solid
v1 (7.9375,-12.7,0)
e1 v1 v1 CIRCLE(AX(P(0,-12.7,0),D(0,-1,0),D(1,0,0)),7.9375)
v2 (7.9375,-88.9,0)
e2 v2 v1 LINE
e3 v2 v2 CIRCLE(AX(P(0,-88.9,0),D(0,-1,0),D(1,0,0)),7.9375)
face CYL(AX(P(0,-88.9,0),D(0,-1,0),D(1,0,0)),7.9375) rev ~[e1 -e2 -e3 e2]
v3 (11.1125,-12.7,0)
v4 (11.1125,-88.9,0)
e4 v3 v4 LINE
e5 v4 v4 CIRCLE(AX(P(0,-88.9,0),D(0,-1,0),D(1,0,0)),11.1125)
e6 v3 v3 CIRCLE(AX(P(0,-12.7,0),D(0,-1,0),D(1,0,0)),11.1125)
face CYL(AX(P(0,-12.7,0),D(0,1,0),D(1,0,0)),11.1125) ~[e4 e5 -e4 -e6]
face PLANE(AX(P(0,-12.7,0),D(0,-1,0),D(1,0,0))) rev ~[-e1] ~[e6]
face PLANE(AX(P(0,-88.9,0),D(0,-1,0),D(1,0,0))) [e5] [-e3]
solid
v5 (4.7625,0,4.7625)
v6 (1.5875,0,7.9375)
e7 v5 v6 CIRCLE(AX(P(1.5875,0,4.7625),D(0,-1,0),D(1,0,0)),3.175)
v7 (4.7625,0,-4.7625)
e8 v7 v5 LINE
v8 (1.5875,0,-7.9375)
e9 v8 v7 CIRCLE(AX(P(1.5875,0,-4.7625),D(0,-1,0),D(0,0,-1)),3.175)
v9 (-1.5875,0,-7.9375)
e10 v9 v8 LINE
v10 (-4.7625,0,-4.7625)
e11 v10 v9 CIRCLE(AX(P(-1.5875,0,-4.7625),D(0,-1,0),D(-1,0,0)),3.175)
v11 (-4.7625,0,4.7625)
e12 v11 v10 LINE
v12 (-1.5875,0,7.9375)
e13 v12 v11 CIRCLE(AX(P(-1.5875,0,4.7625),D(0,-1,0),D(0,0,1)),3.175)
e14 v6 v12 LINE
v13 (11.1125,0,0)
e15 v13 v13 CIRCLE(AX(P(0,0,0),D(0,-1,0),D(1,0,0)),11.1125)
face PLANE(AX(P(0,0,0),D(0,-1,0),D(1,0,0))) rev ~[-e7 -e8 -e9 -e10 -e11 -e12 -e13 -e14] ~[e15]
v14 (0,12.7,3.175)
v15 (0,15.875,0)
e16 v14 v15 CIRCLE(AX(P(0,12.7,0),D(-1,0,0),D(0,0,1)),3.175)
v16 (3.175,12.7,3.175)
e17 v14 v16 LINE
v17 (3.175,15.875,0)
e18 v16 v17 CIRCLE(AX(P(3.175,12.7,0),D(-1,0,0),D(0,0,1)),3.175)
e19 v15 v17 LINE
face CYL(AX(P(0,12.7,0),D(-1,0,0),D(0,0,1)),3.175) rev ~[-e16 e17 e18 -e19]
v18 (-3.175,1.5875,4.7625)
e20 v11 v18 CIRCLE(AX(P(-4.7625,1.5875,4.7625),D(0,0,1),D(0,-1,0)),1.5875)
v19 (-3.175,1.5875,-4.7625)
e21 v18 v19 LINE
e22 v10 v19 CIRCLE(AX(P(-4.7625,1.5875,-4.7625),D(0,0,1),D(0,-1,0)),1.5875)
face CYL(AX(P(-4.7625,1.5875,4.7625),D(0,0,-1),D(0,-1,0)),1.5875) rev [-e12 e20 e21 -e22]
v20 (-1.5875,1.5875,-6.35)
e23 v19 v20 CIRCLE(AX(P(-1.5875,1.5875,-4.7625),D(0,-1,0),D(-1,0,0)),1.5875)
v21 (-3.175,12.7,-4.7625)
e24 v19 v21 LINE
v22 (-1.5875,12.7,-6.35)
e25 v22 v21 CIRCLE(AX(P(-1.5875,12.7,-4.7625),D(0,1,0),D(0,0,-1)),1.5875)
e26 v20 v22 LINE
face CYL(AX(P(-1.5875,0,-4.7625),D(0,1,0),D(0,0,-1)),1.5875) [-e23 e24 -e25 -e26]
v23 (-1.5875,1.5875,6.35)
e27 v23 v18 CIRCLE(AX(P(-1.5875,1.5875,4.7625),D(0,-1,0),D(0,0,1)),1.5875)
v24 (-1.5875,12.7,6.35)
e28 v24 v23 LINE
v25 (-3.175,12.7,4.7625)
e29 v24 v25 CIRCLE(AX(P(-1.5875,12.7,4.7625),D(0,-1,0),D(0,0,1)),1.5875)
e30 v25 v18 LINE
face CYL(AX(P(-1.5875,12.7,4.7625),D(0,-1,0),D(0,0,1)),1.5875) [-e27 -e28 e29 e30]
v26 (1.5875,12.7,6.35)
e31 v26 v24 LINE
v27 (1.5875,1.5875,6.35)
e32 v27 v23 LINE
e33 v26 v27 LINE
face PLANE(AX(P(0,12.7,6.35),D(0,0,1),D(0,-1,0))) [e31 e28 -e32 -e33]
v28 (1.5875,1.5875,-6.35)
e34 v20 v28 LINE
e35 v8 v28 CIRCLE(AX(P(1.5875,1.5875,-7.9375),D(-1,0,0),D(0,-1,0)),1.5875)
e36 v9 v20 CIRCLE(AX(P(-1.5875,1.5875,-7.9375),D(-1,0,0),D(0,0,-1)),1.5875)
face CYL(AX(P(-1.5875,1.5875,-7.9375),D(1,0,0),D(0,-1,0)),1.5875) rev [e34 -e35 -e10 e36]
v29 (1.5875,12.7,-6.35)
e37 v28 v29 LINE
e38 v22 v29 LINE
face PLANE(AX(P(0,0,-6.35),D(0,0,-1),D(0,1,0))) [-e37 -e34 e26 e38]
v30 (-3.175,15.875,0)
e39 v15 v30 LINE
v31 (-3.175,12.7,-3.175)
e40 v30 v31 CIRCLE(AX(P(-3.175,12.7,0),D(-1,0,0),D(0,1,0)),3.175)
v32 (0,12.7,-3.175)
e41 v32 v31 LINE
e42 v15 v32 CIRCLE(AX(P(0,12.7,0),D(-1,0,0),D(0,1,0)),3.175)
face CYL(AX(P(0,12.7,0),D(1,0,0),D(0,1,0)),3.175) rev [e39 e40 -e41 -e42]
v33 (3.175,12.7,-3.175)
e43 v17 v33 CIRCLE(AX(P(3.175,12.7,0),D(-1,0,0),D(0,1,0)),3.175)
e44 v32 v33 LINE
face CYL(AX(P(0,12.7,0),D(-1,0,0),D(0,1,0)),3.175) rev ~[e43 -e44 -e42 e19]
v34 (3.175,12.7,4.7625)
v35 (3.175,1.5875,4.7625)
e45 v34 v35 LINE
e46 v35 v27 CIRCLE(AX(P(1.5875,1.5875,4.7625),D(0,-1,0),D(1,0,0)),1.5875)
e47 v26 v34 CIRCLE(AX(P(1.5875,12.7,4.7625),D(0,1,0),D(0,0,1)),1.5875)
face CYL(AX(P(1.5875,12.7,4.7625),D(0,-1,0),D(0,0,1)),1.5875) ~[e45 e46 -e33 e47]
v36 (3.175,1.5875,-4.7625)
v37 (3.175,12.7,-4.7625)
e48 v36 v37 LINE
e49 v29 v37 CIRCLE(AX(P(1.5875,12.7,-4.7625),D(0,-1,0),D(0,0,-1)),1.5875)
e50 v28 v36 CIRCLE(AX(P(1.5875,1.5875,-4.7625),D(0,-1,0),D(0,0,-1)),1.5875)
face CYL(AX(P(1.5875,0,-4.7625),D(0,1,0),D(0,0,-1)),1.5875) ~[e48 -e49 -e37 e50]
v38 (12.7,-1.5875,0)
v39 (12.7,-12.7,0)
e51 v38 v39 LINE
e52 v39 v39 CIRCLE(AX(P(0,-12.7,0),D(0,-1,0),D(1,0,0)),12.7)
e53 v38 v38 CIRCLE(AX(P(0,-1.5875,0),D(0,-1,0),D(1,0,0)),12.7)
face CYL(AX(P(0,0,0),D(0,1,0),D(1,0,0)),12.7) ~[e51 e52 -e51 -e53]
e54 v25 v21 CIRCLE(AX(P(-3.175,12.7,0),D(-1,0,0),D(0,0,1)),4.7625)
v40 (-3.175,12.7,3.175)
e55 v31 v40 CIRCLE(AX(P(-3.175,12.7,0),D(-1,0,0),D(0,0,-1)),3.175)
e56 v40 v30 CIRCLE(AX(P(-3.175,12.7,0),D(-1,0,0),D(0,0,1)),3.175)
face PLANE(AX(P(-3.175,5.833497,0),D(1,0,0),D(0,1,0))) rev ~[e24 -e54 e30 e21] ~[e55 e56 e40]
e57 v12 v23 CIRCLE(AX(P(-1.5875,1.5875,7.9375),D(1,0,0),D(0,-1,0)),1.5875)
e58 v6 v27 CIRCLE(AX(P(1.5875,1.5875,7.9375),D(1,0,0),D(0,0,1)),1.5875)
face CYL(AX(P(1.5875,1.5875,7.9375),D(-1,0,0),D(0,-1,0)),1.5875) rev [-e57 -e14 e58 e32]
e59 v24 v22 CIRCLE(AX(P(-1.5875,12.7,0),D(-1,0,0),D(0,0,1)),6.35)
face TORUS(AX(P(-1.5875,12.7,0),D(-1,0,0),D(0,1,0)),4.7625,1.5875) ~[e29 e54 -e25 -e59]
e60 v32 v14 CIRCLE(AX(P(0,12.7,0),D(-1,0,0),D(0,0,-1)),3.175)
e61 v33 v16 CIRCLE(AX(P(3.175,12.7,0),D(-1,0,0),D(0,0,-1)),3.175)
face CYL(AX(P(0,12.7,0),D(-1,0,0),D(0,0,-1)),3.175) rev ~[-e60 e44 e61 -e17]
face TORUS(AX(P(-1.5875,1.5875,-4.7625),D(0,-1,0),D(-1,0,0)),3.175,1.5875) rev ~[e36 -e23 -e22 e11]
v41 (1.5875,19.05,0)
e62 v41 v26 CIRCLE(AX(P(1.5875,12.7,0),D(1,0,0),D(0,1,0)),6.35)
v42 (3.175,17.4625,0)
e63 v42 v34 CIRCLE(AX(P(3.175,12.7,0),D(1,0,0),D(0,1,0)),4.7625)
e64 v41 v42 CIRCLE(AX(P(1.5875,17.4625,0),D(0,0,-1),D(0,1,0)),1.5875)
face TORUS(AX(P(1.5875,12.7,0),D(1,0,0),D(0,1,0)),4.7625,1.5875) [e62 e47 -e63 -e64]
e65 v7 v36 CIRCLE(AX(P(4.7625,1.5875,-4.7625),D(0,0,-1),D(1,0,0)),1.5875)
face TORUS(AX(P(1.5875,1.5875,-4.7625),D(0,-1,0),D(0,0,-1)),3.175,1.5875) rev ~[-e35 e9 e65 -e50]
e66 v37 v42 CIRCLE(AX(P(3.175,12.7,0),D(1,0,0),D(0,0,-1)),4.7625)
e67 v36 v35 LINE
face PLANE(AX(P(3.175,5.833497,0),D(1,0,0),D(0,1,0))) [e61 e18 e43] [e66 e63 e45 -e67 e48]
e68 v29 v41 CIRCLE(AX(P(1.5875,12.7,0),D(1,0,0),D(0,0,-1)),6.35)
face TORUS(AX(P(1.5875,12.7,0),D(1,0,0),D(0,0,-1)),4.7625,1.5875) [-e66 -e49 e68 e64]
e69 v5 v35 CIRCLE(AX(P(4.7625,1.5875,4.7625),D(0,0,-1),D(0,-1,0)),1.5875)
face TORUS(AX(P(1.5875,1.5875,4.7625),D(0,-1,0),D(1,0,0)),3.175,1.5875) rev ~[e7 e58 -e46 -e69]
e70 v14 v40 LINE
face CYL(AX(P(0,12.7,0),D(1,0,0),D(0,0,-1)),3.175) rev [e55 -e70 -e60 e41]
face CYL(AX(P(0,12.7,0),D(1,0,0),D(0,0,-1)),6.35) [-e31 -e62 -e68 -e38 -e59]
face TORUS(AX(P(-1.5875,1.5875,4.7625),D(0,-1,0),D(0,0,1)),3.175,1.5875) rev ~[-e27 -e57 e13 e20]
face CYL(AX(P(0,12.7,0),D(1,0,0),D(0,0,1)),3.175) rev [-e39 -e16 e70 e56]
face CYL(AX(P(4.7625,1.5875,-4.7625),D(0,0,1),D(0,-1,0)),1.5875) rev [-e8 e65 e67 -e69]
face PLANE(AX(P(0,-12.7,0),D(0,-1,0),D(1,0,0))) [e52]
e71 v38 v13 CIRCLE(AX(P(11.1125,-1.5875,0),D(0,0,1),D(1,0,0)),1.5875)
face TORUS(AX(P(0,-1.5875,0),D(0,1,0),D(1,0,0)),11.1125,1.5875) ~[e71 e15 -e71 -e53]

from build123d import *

# Parameters (mm, degrees)
F0_R     = 12.7
F1_DEPTH = 12.7
F3_DEPTH = 3.175
F4_F1_R  = 1.5875
F4_F2_R  = 1.5875
F5_R     = 11.1125
F6_DEPTH = 76.2
F7_R     = 7.9375
F8_DEPTH = 76.2


with BuildPart() as f1:
    # F0 (on Front) → F1 (new body)
    with BuildSketch(Plane.XZ):
        Circle(F0_R)
    extrude(amount=F1_DEPTH)

    # F2 (on Right) → F3 (join, symmetric)
    with BuildSketch(Plane.YZ):
        with BuildLine():
            Line((0, 6.35), (0, -6.35))
            Line((0, -6.35), (12.7, -6.35))
            ThreePointArc((12.7, -6.35), (6.35, 0), (12.7, 6.35))
            Line((12.7, 6.35), (0, 6.35))
        make_face()
        with BuildLine():
            ThreePointArc((12.7, 6.35), (6.35, 0), (12.7, -6.35))
            Line((12.7, -6.35), (12.7, -3.175))
            ThreePointArc((12.7, -3.175), (9.525, 0), (12.7, 3.175))
            Line((12.7, 3.175), (12.7, 6.35))
        make_face()
        with BuildLine():
            Line((12.7, -3.175), (12.7, -6.35))
            ThreePointArc((12.7, -6.35), (17.1901280605, -4.4901280605), (19.05, 0))
            ThreePointArc((19.05, 0), (17.1901280605, 4.4901280605), (12.7, 6.35))
            Line((12.7, 6.35), (12.7, 3.175))
            ThreePointArc((12.7, 3.175), (14.9450640303, 2.2450640303), (15.875, 0))
            ThreePointArc((15.875, 0), (14.9450640303, -2.2450640303), (12.7, -3.175))
        make_face()
    extrude(amount=F3_DEPTH, both=True)

    # F4: fillet of radius 1.5875 on 10 edges, made by hand

    # F4_f1
    f4_f1_edges = [f1.edges().sort_by_distance(p)[0] for p in [
        (-12.7, 0, 0),
        (3.175, 6.35, 6.35),
        (-3.175, 6.35, 6.35),
        (-3.175, 6.35, -6.35),
        (-3.175, 19.05, 0),
        (3.175, 6.35, -6.35),
        (3.175, 19.05, 0),
    ]]
    fillet(f4_f1_edges, radius=F4_F1_R)

    # F4_f2
    f4_f2_edges = [f1.edges().sort_by_distance(p)[0] for p in [
        (-3.175, 0, 0),
        (0, 0, 6.35),
        (3.175, 0, 0),
        (2.7100320151, 0, 5.8850320151),
        (2.7100320151, 0, -5.8850320151),
        (-2.7100320151, 0, 5.8850320151),
        (-2.7100320151, 0, -5.8850320151),
    ]]
    fillet(f4_f2_edges, radius=F4_F2_R)


with BuildPart() as f6:
    # F5 (on face) → F6 (new body)
    with BuildSketch(Plane.XZ.offset(12.7)):
        Circle(F5_R)
    extrude(amount=F6_DEPTH)

    # F7 (on face) → F8 (cut)
    with BuildSketch(Plane.XZ.offset(88.9)):
        Circle(F7_R)
    extrude(amount=-F8_DEPTH, mode=Mode.SUBTRACT)


solid = Compound([f1.part, f6.part])
